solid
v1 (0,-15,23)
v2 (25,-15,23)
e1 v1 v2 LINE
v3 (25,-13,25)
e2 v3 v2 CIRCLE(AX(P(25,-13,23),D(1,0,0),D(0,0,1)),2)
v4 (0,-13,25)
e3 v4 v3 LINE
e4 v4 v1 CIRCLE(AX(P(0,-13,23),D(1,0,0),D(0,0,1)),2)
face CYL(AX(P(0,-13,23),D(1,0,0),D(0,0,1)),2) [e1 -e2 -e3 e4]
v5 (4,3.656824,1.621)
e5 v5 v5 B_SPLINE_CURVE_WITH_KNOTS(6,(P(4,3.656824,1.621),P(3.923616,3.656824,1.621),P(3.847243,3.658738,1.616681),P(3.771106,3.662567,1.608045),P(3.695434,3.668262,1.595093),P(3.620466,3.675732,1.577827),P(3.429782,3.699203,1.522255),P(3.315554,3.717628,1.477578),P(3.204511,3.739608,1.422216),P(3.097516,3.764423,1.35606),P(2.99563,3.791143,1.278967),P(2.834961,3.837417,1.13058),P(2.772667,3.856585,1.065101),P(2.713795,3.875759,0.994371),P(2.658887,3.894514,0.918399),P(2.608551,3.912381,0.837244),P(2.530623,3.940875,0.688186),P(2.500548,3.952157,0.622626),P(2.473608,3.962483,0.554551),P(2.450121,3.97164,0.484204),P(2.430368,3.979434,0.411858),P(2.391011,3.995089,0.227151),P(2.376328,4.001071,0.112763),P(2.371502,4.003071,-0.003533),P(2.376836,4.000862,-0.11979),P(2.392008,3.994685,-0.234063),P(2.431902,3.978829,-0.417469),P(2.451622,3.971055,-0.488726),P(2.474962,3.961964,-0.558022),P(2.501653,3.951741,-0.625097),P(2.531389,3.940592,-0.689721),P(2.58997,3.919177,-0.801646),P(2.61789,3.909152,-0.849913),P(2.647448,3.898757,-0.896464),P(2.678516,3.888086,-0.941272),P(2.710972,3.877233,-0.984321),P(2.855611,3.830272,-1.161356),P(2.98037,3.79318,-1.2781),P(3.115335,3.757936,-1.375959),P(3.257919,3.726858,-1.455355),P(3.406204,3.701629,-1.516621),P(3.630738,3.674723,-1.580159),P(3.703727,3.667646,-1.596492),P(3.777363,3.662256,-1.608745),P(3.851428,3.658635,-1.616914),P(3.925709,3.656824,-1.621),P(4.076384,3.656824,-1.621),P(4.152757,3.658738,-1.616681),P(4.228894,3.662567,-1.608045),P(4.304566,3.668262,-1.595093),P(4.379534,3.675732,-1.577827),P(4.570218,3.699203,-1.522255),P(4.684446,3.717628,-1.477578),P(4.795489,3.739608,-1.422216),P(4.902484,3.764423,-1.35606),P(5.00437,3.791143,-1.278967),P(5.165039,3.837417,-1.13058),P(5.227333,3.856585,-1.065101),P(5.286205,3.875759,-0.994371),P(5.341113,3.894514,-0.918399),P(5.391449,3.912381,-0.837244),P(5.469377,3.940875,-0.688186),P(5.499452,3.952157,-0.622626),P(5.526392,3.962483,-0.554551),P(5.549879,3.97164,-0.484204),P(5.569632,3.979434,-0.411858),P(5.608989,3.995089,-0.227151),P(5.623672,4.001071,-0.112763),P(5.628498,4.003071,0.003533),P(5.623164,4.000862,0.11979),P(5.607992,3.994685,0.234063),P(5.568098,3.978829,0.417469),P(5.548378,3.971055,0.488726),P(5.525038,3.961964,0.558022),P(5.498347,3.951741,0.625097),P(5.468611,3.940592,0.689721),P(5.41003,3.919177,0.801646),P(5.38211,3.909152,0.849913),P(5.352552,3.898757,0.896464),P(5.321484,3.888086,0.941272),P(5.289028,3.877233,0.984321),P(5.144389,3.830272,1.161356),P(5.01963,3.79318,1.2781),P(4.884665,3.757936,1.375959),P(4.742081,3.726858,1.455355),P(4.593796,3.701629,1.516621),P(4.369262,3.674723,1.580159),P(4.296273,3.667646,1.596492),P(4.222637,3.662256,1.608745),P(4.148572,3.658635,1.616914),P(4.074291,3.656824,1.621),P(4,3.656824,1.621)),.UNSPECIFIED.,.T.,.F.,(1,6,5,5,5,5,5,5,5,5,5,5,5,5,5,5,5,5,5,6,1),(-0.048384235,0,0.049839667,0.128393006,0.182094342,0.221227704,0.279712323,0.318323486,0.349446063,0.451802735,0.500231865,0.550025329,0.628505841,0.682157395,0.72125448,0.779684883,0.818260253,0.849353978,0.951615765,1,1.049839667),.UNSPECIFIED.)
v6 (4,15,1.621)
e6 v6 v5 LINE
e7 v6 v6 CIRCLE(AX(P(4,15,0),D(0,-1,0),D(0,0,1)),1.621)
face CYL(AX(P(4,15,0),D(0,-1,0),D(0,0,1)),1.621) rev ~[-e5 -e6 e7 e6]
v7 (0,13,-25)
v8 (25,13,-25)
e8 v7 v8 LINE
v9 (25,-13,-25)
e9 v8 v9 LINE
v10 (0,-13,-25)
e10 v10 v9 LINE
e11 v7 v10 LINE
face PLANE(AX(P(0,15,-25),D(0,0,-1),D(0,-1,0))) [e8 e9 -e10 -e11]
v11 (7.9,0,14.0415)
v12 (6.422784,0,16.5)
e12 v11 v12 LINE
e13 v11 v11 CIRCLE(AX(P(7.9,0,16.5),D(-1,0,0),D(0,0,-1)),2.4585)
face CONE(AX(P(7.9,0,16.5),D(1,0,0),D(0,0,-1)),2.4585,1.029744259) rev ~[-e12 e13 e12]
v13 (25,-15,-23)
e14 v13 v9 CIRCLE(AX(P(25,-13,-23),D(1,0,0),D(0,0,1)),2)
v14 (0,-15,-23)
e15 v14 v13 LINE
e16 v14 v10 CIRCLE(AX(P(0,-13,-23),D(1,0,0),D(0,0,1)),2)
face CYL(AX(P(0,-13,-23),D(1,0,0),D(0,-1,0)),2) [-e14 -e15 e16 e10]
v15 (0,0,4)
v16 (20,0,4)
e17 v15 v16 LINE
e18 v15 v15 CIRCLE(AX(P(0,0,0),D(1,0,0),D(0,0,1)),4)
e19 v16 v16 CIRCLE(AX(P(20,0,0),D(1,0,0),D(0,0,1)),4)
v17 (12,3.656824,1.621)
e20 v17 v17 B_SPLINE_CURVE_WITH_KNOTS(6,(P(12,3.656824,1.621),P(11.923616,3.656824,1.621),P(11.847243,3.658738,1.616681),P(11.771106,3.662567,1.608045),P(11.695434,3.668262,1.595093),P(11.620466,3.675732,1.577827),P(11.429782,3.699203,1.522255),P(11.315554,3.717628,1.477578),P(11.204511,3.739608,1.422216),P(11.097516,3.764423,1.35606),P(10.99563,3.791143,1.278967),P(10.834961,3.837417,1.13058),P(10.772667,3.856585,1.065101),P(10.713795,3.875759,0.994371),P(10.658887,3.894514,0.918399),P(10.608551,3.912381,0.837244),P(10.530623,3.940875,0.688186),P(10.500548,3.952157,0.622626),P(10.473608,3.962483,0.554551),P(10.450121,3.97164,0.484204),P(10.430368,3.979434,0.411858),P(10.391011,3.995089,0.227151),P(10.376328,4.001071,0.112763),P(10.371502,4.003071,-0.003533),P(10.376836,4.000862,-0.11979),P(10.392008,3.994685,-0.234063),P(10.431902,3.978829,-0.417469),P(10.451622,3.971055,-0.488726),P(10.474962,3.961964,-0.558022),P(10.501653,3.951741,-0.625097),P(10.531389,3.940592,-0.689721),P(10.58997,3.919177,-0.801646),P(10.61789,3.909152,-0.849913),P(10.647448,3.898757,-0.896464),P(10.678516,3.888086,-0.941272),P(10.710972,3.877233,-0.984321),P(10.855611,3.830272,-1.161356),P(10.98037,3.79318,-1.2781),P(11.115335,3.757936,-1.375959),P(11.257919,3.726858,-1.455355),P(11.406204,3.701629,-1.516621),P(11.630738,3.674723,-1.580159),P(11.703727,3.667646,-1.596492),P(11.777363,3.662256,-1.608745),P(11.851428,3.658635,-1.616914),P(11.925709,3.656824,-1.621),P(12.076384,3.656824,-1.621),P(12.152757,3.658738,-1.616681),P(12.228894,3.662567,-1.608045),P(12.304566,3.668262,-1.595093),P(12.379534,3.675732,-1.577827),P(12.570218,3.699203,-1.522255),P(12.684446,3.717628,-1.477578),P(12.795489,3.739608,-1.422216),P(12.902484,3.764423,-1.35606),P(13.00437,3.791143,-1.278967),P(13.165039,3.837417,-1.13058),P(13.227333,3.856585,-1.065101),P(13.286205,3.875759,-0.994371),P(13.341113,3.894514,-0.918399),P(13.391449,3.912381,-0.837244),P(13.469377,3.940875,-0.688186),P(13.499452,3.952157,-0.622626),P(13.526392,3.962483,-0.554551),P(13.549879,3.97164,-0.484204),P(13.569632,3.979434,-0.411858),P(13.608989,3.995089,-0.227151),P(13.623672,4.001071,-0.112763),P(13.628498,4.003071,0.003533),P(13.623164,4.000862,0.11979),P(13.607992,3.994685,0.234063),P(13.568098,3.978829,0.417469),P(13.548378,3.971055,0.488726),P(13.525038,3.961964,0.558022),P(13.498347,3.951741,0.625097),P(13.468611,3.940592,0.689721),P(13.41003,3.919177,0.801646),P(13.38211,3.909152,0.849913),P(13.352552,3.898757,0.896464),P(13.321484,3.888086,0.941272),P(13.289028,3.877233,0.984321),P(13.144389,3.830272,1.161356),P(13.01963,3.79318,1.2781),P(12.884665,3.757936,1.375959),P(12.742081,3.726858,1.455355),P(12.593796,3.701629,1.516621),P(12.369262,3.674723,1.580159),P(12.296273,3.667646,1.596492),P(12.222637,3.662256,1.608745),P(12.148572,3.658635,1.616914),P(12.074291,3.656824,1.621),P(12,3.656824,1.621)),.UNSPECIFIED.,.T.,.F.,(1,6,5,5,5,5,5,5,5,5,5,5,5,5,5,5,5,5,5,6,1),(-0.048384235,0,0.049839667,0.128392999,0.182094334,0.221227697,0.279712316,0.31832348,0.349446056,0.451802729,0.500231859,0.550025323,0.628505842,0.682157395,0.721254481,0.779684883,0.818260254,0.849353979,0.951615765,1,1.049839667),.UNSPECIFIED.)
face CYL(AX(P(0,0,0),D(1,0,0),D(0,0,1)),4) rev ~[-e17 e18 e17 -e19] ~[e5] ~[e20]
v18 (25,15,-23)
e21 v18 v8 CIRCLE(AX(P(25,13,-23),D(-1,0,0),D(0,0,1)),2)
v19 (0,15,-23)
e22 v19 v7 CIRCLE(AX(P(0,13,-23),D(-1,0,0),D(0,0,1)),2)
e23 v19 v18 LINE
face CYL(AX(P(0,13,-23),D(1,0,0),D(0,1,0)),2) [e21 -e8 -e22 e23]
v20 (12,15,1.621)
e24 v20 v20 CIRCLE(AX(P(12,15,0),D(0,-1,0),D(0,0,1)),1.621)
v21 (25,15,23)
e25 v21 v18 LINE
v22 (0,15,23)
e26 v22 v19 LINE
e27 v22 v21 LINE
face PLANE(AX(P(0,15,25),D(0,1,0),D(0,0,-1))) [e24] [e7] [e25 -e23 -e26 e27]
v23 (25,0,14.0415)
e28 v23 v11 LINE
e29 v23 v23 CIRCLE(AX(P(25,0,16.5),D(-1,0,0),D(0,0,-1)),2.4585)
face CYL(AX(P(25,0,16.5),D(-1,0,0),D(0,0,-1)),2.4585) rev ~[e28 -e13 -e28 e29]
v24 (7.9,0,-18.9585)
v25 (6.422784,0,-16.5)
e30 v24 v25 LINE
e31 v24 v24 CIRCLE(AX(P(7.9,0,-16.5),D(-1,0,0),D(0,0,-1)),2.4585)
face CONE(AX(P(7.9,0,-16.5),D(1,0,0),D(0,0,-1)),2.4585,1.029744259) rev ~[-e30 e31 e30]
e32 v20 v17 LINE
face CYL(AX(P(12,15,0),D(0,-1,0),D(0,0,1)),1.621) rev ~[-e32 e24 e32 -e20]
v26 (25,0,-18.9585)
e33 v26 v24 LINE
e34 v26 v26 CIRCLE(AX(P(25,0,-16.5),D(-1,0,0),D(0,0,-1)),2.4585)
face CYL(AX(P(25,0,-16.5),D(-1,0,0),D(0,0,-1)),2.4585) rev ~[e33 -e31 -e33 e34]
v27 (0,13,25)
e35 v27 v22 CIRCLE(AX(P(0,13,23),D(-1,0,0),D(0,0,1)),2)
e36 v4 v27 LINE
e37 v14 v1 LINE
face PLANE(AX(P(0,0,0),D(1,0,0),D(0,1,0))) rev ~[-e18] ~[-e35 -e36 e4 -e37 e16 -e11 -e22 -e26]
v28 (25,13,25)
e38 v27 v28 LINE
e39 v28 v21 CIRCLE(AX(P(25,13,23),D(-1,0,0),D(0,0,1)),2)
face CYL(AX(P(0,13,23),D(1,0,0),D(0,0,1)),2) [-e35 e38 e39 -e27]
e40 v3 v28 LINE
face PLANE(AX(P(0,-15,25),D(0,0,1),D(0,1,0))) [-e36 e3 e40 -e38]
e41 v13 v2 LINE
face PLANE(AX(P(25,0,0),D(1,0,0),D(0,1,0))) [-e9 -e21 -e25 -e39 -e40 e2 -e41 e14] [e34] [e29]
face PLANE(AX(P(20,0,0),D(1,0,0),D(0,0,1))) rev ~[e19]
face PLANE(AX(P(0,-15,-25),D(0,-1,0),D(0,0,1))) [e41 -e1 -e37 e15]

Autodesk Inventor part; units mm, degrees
ref_plane "YZ Plane" through (0, 0, 0) normal (1, 0, 0) x (0, 1, 0)
ref_plane "XZ Plane" through (0, 0, 0) normal (0, 1, 0) x (-1, 0, 0)
ref_plane "XY Plane" through (0, 0, 0) normal (0, 0, 1) x (1, 0, 0)
sketch "Sketch1" plane through (0, 0, 0) normal (1, 0, 0) x (0, 1, 0)
  line L0 (-15, 25) -> (15, 25)
  line L1 (15, 25) -> (15, -25)
  line L2 (15, -25) -> (-15, -25)
  line L3 (-15, -25) -> (-15, 25)
  line L4 (-15, 25) -> (15, -25) construction
  line L5 (15, 25) -> (-15, -25) construction
  point P0 (0, 0)
  dimension "d1" = 50
  dimension "d2" = 30
extrude "Extrusion1" add sketch "Sketch1" along normal blind 25
hole "Hole1" at (0, 0, 0) direction (1, 0, 0) diameter 8 depth 20
sketch "Sketch2" plane through (0, 15, 25) normal (0, 1, 0) x (1, 0, 0)
  line L0 (0, 25) -> (25, 25) construction
  line L1 (25, 50) -> (25, 0) construction
  line L2 (0, 50) -> (0, 0) construction
  point P0 (4, 25)
  point P1 (12, 25)
  dimension "d12" = 4
  dimension "d13" = 12
hole "Hole2" at (4, 15, 0) at (12, 15, 0) direction (0, -1, 0) diameter 3.242 end up to surface thread size "M4x0.7" class "6H" standard "ISO Metric profile"
sketch "Sketch3" plane through (25, 0, 0) normal (1, 0, 0) x (0, 0, -1)
  line L0 (-16.5, 0) -> (0, 0) construction
  line L1 (0, 0) -> (16.5, 0) construction
  dimension "d21" = 33
hole "Hole3" at (25, 0, 16.5) at (25, 0, -16.5) direction (-1, 0, 0) diameter 4.917 depth 17.1 tip angle 118 thread size "M6x1" class "6H" standard "ISO Metric profile"
fillet "Fillet1" radius 2 4 edges at (12.5, 15, -25) (12.5, -15, -25) (12.5, -15, 25) (12.5, 15, 25)
properties part number "axle_tube_mount_8mm" material "Steel, Alloy"
